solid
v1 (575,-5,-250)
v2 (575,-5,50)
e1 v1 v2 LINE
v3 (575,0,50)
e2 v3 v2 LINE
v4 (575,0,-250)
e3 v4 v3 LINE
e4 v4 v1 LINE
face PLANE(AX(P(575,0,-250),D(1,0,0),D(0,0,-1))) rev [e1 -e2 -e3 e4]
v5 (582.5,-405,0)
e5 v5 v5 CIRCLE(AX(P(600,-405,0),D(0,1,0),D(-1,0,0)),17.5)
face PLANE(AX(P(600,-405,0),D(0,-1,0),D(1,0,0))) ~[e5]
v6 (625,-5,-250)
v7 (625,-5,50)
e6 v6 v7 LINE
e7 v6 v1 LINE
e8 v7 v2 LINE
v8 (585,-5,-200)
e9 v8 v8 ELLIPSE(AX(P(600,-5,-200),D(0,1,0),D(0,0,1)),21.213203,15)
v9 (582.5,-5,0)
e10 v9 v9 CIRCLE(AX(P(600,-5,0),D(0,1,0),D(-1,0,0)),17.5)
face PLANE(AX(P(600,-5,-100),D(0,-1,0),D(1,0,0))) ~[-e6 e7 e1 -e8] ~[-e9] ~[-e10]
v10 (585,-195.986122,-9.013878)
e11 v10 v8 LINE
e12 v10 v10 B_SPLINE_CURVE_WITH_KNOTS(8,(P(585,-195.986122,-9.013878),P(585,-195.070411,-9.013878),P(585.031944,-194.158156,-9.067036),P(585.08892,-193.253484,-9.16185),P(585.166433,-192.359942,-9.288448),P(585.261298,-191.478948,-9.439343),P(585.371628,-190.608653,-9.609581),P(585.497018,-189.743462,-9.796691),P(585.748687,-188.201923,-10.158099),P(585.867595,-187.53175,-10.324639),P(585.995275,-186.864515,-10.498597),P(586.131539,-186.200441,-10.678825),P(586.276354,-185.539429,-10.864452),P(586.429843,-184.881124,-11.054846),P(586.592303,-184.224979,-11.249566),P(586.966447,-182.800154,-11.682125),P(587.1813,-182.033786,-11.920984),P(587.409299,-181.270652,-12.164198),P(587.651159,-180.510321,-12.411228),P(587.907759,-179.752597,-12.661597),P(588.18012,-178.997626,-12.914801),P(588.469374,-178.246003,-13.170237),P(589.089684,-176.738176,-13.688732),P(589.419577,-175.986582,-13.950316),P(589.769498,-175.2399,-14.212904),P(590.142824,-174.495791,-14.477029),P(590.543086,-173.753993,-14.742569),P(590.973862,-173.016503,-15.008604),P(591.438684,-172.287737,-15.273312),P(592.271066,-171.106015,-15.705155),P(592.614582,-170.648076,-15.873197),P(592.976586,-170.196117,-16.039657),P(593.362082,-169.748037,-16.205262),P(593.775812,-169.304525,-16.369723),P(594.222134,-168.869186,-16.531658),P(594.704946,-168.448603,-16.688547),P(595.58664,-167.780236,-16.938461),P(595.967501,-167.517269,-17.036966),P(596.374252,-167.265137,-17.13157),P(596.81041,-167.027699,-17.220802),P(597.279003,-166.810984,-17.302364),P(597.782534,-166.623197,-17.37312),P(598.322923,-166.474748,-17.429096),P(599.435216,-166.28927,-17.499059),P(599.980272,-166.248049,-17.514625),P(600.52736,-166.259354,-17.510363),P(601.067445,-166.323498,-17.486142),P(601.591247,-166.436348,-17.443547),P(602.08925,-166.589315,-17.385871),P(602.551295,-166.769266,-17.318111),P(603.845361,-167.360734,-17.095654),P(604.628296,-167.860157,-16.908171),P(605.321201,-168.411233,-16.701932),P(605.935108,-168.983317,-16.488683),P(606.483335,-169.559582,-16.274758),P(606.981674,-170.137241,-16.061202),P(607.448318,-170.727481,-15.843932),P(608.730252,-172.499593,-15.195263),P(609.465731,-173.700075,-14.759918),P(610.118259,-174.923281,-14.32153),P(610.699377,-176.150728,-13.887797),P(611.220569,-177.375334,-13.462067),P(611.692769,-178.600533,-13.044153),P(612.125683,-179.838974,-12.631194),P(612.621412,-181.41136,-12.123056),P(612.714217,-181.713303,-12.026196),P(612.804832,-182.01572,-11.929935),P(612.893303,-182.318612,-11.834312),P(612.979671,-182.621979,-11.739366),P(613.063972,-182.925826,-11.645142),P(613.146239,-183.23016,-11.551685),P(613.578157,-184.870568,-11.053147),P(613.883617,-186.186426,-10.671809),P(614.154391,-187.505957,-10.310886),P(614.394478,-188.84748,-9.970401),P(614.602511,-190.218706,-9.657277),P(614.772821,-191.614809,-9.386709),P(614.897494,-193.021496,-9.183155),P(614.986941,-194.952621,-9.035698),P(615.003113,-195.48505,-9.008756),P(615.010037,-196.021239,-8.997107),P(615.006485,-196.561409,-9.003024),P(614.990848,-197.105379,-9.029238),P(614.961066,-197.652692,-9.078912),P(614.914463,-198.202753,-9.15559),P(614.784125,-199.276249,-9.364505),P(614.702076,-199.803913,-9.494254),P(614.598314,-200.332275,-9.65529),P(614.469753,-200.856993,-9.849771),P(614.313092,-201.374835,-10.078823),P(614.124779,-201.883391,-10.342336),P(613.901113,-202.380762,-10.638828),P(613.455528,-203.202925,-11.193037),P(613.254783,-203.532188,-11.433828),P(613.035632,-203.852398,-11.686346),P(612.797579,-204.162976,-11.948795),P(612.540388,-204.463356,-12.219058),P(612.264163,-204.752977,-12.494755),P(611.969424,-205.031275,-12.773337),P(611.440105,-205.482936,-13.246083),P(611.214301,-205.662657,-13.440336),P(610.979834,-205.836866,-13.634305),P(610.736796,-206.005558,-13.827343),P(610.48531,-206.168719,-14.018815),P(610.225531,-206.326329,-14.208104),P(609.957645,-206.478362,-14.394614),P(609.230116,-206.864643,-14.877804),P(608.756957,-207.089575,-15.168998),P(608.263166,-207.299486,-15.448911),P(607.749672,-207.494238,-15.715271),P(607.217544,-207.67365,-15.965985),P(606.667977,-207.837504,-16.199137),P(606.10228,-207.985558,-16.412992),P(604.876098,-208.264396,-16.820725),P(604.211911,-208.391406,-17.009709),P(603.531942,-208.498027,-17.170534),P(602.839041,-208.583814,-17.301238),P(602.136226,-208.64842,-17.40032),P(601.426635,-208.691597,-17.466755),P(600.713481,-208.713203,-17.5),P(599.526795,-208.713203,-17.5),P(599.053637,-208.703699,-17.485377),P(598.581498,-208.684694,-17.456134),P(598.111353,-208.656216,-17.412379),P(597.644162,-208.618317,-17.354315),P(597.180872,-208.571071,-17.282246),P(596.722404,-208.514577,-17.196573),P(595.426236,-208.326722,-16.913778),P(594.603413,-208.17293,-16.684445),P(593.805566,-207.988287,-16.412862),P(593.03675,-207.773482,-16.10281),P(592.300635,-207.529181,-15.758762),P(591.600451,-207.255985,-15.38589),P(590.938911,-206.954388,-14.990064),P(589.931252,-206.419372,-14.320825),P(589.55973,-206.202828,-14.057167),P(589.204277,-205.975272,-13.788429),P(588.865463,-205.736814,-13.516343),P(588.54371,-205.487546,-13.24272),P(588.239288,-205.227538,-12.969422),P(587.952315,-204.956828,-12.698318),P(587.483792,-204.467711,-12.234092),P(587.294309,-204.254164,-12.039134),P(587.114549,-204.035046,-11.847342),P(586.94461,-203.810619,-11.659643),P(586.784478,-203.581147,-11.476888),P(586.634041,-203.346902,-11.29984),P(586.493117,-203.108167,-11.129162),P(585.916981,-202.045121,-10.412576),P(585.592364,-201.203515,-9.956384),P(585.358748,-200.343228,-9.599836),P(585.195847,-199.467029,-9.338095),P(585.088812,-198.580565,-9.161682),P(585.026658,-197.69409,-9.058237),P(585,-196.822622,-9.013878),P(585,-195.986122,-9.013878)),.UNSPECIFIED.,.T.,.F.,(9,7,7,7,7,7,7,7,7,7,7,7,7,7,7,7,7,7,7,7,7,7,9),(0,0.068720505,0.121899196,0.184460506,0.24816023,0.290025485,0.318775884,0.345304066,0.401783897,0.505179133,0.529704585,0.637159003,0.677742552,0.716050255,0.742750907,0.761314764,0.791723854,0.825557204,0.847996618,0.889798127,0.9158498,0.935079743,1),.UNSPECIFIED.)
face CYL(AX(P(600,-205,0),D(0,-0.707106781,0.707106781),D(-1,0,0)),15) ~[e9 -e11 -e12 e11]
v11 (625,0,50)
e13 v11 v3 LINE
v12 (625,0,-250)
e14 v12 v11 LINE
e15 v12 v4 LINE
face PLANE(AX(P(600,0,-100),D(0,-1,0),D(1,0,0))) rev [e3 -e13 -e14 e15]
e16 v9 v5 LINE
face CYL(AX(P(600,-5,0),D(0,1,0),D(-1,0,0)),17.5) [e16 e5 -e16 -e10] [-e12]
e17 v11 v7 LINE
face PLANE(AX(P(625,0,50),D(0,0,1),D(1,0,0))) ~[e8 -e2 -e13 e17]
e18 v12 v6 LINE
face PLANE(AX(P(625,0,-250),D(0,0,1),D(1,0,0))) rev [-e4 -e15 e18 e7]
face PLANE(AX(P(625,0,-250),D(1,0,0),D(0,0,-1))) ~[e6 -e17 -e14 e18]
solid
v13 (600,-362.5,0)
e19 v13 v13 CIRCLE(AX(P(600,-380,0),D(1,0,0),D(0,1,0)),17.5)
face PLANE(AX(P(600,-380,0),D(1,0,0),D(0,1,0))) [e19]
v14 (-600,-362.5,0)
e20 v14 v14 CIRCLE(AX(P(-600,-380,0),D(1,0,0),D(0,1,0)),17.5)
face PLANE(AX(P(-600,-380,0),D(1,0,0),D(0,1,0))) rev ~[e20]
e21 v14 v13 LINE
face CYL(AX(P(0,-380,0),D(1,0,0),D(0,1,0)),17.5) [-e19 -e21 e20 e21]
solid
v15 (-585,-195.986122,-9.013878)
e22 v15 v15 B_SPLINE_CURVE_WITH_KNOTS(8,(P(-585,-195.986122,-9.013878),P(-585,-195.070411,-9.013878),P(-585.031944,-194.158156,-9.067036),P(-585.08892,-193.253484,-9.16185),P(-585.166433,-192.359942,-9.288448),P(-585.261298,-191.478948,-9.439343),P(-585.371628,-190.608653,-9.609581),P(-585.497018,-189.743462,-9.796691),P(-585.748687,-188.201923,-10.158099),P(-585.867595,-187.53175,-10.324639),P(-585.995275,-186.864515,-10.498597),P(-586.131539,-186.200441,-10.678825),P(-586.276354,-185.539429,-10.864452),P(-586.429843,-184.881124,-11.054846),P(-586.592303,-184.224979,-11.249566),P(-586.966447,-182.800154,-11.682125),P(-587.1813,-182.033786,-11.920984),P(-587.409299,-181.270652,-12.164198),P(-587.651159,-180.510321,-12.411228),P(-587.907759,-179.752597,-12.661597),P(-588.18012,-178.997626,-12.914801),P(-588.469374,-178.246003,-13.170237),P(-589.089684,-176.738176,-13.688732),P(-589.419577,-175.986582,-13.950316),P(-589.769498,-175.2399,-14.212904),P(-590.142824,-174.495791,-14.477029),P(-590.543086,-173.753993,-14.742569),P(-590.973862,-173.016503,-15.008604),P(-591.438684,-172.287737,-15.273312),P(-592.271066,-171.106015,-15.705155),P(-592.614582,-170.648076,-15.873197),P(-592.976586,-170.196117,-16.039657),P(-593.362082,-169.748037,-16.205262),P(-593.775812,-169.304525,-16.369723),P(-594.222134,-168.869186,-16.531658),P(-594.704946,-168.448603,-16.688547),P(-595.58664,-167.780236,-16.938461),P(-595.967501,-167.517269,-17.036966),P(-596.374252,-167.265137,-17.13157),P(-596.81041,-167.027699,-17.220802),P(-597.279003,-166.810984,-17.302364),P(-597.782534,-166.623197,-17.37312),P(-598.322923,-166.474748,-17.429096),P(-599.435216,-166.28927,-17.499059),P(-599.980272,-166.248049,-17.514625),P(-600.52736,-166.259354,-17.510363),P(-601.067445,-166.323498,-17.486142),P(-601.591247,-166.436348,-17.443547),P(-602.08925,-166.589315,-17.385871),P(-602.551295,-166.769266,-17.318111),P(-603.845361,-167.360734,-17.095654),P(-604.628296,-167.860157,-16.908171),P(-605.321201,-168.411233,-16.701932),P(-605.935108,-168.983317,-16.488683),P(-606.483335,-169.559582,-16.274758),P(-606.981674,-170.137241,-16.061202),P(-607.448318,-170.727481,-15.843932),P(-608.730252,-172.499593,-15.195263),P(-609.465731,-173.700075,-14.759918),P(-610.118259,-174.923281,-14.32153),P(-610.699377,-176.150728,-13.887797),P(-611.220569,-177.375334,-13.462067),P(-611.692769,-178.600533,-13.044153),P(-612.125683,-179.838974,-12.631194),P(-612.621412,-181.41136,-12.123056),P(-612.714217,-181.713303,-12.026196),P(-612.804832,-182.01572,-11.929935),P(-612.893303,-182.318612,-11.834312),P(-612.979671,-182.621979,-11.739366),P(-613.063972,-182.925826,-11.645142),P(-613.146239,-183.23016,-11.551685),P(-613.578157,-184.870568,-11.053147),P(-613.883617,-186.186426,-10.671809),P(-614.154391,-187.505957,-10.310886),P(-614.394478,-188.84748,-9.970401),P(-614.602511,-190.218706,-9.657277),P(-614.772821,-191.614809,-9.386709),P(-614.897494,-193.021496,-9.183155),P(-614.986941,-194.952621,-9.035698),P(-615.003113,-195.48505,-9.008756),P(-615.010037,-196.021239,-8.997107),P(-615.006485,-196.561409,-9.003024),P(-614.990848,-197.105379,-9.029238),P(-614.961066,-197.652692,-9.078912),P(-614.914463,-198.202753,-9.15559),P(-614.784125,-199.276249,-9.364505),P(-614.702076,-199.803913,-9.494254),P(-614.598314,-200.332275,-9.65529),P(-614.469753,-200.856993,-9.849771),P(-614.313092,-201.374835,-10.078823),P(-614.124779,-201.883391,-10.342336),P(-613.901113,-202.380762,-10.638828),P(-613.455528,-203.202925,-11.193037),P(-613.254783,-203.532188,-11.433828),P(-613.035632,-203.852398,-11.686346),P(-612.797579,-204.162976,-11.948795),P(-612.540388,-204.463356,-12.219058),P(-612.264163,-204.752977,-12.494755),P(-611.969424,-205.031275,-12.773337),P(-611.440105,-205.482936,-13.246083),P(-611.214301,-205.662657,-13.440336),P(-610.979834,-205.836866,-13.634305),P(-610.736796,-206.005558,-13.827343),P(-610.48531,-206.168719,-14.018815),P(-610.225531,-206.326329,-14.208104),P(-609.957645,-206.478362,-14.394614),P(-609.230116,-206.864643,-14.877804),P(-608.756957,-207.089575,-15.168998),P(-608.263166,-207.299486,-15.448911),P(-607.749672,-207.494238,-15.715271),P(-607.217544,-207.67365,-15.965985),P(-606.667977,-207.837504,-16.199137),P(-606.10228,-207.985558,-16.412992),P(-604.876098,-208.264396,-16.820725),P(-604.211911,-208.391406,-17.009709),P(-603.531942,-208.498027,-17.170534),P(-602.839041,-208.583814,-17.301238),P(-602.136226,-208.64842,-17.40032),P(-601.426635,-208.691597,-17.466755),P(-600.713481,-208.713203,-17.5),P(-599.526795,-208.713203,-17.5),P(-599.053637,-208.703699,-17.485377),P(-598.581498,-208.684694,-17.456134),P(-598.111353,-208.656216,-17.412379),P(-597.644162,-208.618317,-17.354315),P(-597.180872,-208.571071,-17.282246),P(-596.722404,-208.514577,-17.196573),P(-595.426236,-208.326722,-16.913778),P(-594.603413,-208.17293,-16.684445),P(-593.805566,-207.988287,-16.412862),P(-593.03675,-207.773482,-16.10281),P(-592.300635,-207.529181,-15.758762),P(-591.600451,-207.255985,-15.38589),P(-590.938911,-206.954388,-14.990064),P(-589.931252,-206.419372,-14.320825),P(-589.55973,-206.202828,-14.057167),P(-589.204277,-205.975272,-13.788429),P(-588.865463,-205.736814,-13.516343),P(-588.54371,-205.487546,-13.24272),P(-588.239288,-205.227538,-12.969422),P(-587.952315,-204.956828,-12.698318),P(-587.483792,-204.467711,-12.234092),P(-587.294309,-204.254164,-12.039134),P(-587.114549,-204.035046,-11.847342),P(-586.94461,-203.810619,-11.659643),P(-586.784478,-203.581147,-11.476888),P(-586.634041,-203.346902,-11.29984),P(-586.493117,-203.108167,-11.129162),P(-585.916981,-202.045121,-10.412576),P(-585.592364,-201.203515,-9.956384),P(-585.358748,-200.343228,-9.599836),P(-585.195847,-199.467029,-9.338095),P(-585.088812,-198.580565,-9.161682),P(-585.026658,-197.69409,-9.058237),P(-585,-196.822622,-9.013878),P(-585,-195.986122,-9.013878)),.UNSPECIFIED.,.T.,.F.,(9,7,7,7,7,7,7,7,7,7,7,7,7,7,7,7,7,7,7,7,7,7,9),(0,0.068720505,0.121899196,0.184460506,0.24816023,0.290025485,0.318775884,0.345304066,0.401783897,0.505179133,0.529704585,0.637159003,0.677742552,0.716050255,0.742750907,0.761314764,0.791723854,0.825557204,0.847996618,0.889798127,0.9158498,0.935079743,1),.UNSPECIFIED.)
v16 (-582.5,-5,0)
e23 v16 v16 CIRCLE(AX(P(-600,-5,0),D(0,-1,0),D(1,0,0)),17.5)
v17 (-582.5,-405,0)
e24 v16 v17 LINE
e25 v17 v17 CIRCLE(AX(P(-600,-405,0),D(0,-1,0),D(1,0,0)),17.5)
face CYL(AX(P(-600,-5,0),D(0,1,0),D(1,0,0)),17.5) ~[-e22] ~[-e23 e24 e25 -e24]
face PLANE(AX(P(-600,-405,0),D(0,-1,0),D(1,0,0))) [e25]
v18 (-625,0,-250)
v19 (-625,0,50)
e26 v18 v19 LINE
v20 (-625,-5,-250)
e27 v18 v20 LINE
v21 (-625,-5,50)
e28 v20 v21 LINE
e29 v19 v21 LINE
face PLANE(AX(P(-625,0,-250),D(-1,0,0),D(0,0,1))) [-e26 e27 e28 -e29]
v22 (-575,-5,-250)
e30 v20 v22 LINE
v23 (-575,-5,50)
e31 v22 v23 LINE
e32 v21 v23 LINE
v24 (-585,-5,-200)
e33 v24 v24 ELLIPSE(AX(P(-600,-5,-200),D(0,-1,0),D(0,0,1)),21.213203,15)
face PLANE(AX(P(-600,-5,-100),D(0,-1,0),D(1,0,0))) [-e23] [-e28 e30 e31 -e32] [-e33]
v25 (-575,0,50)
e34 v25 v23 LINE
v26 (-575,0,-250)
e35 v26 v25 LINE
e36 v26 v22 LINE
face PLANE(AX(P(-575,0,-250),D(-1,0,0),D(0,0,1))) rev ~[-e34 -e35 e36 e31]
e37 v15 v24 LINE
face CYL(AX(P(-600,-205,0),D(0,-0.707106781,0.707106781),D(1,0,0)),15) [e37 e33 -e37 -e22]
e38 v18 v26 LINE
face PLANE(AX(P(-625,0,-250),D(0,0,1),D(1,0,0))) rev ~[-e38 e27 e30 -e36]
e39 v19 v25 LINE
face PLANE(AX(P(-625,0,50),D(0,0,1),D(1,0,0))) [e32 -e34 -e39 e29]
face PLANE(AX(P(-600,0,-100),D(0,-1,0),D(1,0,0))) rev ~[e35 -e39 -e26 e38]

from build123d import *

# Parameters (mm, degrees)
F0_W      = 50
F0_H      = 300
F1_DEPTH  = 5
F2_R      = 17.5
F3_DEPTH  = 400
F7_R      = 15
F8_REACH  = 364.1609923111
F10_R     = 17.5
F11_DEPTH = 600


with BuildPart() as f1:
    # F0 (on Front) → F1 (new body)
    with BuildSketch(Plane.XZ):
        with Locations((-600, -100)):
            Rectangle(F0_W, F0_H)
    extrude(amount=F1_DEPTH)

    # F2 (on face) → F3 (join)
    with BuildSketch(Plane.XZ.offset(5)):
        with Locations((-600, 0)):
            Circle(F2_R)
    extrude(amount=F3_DEPTH)

    f8_end = f1.faces().sort_by_distance((-600, -5, -106.8536862637))[0]
    # F7 (on line) → F8 (join, up to a face of the model that its end follows)
    with BuildSketch(Plane(origin=(0, -102.5, 102.5), x_dir=(1, 0, 0), z_dir=(0, -0.7071067812, 0.7071067812))):
        with Locations((-600, -144.9568901432)):
            Circle(F7_R)
    f8_long = extrude(amount=-F8_REACH, mode=Mode.PRIVATE)
    add(split(f8_long, bisect_by=f8_end, keep=Keep.TOP, mode=Mode.PRIVATE))


with BuildPart() as f9_1:
    # F9: instance of F1
    add(f1.part.mirror(Plane.YZ))


with BuildPart() as f11:
    # F10 (on Right) → F11 (new body, symmetric)
    with BuildSketch(Plane.YZ):
        with Locations((-380, 0)):
            Circle(F10_R)
    extrude(amount=F11_DEPTH, both=True)


solid = Compound([f1.part, f9_1.part, f11.part])
